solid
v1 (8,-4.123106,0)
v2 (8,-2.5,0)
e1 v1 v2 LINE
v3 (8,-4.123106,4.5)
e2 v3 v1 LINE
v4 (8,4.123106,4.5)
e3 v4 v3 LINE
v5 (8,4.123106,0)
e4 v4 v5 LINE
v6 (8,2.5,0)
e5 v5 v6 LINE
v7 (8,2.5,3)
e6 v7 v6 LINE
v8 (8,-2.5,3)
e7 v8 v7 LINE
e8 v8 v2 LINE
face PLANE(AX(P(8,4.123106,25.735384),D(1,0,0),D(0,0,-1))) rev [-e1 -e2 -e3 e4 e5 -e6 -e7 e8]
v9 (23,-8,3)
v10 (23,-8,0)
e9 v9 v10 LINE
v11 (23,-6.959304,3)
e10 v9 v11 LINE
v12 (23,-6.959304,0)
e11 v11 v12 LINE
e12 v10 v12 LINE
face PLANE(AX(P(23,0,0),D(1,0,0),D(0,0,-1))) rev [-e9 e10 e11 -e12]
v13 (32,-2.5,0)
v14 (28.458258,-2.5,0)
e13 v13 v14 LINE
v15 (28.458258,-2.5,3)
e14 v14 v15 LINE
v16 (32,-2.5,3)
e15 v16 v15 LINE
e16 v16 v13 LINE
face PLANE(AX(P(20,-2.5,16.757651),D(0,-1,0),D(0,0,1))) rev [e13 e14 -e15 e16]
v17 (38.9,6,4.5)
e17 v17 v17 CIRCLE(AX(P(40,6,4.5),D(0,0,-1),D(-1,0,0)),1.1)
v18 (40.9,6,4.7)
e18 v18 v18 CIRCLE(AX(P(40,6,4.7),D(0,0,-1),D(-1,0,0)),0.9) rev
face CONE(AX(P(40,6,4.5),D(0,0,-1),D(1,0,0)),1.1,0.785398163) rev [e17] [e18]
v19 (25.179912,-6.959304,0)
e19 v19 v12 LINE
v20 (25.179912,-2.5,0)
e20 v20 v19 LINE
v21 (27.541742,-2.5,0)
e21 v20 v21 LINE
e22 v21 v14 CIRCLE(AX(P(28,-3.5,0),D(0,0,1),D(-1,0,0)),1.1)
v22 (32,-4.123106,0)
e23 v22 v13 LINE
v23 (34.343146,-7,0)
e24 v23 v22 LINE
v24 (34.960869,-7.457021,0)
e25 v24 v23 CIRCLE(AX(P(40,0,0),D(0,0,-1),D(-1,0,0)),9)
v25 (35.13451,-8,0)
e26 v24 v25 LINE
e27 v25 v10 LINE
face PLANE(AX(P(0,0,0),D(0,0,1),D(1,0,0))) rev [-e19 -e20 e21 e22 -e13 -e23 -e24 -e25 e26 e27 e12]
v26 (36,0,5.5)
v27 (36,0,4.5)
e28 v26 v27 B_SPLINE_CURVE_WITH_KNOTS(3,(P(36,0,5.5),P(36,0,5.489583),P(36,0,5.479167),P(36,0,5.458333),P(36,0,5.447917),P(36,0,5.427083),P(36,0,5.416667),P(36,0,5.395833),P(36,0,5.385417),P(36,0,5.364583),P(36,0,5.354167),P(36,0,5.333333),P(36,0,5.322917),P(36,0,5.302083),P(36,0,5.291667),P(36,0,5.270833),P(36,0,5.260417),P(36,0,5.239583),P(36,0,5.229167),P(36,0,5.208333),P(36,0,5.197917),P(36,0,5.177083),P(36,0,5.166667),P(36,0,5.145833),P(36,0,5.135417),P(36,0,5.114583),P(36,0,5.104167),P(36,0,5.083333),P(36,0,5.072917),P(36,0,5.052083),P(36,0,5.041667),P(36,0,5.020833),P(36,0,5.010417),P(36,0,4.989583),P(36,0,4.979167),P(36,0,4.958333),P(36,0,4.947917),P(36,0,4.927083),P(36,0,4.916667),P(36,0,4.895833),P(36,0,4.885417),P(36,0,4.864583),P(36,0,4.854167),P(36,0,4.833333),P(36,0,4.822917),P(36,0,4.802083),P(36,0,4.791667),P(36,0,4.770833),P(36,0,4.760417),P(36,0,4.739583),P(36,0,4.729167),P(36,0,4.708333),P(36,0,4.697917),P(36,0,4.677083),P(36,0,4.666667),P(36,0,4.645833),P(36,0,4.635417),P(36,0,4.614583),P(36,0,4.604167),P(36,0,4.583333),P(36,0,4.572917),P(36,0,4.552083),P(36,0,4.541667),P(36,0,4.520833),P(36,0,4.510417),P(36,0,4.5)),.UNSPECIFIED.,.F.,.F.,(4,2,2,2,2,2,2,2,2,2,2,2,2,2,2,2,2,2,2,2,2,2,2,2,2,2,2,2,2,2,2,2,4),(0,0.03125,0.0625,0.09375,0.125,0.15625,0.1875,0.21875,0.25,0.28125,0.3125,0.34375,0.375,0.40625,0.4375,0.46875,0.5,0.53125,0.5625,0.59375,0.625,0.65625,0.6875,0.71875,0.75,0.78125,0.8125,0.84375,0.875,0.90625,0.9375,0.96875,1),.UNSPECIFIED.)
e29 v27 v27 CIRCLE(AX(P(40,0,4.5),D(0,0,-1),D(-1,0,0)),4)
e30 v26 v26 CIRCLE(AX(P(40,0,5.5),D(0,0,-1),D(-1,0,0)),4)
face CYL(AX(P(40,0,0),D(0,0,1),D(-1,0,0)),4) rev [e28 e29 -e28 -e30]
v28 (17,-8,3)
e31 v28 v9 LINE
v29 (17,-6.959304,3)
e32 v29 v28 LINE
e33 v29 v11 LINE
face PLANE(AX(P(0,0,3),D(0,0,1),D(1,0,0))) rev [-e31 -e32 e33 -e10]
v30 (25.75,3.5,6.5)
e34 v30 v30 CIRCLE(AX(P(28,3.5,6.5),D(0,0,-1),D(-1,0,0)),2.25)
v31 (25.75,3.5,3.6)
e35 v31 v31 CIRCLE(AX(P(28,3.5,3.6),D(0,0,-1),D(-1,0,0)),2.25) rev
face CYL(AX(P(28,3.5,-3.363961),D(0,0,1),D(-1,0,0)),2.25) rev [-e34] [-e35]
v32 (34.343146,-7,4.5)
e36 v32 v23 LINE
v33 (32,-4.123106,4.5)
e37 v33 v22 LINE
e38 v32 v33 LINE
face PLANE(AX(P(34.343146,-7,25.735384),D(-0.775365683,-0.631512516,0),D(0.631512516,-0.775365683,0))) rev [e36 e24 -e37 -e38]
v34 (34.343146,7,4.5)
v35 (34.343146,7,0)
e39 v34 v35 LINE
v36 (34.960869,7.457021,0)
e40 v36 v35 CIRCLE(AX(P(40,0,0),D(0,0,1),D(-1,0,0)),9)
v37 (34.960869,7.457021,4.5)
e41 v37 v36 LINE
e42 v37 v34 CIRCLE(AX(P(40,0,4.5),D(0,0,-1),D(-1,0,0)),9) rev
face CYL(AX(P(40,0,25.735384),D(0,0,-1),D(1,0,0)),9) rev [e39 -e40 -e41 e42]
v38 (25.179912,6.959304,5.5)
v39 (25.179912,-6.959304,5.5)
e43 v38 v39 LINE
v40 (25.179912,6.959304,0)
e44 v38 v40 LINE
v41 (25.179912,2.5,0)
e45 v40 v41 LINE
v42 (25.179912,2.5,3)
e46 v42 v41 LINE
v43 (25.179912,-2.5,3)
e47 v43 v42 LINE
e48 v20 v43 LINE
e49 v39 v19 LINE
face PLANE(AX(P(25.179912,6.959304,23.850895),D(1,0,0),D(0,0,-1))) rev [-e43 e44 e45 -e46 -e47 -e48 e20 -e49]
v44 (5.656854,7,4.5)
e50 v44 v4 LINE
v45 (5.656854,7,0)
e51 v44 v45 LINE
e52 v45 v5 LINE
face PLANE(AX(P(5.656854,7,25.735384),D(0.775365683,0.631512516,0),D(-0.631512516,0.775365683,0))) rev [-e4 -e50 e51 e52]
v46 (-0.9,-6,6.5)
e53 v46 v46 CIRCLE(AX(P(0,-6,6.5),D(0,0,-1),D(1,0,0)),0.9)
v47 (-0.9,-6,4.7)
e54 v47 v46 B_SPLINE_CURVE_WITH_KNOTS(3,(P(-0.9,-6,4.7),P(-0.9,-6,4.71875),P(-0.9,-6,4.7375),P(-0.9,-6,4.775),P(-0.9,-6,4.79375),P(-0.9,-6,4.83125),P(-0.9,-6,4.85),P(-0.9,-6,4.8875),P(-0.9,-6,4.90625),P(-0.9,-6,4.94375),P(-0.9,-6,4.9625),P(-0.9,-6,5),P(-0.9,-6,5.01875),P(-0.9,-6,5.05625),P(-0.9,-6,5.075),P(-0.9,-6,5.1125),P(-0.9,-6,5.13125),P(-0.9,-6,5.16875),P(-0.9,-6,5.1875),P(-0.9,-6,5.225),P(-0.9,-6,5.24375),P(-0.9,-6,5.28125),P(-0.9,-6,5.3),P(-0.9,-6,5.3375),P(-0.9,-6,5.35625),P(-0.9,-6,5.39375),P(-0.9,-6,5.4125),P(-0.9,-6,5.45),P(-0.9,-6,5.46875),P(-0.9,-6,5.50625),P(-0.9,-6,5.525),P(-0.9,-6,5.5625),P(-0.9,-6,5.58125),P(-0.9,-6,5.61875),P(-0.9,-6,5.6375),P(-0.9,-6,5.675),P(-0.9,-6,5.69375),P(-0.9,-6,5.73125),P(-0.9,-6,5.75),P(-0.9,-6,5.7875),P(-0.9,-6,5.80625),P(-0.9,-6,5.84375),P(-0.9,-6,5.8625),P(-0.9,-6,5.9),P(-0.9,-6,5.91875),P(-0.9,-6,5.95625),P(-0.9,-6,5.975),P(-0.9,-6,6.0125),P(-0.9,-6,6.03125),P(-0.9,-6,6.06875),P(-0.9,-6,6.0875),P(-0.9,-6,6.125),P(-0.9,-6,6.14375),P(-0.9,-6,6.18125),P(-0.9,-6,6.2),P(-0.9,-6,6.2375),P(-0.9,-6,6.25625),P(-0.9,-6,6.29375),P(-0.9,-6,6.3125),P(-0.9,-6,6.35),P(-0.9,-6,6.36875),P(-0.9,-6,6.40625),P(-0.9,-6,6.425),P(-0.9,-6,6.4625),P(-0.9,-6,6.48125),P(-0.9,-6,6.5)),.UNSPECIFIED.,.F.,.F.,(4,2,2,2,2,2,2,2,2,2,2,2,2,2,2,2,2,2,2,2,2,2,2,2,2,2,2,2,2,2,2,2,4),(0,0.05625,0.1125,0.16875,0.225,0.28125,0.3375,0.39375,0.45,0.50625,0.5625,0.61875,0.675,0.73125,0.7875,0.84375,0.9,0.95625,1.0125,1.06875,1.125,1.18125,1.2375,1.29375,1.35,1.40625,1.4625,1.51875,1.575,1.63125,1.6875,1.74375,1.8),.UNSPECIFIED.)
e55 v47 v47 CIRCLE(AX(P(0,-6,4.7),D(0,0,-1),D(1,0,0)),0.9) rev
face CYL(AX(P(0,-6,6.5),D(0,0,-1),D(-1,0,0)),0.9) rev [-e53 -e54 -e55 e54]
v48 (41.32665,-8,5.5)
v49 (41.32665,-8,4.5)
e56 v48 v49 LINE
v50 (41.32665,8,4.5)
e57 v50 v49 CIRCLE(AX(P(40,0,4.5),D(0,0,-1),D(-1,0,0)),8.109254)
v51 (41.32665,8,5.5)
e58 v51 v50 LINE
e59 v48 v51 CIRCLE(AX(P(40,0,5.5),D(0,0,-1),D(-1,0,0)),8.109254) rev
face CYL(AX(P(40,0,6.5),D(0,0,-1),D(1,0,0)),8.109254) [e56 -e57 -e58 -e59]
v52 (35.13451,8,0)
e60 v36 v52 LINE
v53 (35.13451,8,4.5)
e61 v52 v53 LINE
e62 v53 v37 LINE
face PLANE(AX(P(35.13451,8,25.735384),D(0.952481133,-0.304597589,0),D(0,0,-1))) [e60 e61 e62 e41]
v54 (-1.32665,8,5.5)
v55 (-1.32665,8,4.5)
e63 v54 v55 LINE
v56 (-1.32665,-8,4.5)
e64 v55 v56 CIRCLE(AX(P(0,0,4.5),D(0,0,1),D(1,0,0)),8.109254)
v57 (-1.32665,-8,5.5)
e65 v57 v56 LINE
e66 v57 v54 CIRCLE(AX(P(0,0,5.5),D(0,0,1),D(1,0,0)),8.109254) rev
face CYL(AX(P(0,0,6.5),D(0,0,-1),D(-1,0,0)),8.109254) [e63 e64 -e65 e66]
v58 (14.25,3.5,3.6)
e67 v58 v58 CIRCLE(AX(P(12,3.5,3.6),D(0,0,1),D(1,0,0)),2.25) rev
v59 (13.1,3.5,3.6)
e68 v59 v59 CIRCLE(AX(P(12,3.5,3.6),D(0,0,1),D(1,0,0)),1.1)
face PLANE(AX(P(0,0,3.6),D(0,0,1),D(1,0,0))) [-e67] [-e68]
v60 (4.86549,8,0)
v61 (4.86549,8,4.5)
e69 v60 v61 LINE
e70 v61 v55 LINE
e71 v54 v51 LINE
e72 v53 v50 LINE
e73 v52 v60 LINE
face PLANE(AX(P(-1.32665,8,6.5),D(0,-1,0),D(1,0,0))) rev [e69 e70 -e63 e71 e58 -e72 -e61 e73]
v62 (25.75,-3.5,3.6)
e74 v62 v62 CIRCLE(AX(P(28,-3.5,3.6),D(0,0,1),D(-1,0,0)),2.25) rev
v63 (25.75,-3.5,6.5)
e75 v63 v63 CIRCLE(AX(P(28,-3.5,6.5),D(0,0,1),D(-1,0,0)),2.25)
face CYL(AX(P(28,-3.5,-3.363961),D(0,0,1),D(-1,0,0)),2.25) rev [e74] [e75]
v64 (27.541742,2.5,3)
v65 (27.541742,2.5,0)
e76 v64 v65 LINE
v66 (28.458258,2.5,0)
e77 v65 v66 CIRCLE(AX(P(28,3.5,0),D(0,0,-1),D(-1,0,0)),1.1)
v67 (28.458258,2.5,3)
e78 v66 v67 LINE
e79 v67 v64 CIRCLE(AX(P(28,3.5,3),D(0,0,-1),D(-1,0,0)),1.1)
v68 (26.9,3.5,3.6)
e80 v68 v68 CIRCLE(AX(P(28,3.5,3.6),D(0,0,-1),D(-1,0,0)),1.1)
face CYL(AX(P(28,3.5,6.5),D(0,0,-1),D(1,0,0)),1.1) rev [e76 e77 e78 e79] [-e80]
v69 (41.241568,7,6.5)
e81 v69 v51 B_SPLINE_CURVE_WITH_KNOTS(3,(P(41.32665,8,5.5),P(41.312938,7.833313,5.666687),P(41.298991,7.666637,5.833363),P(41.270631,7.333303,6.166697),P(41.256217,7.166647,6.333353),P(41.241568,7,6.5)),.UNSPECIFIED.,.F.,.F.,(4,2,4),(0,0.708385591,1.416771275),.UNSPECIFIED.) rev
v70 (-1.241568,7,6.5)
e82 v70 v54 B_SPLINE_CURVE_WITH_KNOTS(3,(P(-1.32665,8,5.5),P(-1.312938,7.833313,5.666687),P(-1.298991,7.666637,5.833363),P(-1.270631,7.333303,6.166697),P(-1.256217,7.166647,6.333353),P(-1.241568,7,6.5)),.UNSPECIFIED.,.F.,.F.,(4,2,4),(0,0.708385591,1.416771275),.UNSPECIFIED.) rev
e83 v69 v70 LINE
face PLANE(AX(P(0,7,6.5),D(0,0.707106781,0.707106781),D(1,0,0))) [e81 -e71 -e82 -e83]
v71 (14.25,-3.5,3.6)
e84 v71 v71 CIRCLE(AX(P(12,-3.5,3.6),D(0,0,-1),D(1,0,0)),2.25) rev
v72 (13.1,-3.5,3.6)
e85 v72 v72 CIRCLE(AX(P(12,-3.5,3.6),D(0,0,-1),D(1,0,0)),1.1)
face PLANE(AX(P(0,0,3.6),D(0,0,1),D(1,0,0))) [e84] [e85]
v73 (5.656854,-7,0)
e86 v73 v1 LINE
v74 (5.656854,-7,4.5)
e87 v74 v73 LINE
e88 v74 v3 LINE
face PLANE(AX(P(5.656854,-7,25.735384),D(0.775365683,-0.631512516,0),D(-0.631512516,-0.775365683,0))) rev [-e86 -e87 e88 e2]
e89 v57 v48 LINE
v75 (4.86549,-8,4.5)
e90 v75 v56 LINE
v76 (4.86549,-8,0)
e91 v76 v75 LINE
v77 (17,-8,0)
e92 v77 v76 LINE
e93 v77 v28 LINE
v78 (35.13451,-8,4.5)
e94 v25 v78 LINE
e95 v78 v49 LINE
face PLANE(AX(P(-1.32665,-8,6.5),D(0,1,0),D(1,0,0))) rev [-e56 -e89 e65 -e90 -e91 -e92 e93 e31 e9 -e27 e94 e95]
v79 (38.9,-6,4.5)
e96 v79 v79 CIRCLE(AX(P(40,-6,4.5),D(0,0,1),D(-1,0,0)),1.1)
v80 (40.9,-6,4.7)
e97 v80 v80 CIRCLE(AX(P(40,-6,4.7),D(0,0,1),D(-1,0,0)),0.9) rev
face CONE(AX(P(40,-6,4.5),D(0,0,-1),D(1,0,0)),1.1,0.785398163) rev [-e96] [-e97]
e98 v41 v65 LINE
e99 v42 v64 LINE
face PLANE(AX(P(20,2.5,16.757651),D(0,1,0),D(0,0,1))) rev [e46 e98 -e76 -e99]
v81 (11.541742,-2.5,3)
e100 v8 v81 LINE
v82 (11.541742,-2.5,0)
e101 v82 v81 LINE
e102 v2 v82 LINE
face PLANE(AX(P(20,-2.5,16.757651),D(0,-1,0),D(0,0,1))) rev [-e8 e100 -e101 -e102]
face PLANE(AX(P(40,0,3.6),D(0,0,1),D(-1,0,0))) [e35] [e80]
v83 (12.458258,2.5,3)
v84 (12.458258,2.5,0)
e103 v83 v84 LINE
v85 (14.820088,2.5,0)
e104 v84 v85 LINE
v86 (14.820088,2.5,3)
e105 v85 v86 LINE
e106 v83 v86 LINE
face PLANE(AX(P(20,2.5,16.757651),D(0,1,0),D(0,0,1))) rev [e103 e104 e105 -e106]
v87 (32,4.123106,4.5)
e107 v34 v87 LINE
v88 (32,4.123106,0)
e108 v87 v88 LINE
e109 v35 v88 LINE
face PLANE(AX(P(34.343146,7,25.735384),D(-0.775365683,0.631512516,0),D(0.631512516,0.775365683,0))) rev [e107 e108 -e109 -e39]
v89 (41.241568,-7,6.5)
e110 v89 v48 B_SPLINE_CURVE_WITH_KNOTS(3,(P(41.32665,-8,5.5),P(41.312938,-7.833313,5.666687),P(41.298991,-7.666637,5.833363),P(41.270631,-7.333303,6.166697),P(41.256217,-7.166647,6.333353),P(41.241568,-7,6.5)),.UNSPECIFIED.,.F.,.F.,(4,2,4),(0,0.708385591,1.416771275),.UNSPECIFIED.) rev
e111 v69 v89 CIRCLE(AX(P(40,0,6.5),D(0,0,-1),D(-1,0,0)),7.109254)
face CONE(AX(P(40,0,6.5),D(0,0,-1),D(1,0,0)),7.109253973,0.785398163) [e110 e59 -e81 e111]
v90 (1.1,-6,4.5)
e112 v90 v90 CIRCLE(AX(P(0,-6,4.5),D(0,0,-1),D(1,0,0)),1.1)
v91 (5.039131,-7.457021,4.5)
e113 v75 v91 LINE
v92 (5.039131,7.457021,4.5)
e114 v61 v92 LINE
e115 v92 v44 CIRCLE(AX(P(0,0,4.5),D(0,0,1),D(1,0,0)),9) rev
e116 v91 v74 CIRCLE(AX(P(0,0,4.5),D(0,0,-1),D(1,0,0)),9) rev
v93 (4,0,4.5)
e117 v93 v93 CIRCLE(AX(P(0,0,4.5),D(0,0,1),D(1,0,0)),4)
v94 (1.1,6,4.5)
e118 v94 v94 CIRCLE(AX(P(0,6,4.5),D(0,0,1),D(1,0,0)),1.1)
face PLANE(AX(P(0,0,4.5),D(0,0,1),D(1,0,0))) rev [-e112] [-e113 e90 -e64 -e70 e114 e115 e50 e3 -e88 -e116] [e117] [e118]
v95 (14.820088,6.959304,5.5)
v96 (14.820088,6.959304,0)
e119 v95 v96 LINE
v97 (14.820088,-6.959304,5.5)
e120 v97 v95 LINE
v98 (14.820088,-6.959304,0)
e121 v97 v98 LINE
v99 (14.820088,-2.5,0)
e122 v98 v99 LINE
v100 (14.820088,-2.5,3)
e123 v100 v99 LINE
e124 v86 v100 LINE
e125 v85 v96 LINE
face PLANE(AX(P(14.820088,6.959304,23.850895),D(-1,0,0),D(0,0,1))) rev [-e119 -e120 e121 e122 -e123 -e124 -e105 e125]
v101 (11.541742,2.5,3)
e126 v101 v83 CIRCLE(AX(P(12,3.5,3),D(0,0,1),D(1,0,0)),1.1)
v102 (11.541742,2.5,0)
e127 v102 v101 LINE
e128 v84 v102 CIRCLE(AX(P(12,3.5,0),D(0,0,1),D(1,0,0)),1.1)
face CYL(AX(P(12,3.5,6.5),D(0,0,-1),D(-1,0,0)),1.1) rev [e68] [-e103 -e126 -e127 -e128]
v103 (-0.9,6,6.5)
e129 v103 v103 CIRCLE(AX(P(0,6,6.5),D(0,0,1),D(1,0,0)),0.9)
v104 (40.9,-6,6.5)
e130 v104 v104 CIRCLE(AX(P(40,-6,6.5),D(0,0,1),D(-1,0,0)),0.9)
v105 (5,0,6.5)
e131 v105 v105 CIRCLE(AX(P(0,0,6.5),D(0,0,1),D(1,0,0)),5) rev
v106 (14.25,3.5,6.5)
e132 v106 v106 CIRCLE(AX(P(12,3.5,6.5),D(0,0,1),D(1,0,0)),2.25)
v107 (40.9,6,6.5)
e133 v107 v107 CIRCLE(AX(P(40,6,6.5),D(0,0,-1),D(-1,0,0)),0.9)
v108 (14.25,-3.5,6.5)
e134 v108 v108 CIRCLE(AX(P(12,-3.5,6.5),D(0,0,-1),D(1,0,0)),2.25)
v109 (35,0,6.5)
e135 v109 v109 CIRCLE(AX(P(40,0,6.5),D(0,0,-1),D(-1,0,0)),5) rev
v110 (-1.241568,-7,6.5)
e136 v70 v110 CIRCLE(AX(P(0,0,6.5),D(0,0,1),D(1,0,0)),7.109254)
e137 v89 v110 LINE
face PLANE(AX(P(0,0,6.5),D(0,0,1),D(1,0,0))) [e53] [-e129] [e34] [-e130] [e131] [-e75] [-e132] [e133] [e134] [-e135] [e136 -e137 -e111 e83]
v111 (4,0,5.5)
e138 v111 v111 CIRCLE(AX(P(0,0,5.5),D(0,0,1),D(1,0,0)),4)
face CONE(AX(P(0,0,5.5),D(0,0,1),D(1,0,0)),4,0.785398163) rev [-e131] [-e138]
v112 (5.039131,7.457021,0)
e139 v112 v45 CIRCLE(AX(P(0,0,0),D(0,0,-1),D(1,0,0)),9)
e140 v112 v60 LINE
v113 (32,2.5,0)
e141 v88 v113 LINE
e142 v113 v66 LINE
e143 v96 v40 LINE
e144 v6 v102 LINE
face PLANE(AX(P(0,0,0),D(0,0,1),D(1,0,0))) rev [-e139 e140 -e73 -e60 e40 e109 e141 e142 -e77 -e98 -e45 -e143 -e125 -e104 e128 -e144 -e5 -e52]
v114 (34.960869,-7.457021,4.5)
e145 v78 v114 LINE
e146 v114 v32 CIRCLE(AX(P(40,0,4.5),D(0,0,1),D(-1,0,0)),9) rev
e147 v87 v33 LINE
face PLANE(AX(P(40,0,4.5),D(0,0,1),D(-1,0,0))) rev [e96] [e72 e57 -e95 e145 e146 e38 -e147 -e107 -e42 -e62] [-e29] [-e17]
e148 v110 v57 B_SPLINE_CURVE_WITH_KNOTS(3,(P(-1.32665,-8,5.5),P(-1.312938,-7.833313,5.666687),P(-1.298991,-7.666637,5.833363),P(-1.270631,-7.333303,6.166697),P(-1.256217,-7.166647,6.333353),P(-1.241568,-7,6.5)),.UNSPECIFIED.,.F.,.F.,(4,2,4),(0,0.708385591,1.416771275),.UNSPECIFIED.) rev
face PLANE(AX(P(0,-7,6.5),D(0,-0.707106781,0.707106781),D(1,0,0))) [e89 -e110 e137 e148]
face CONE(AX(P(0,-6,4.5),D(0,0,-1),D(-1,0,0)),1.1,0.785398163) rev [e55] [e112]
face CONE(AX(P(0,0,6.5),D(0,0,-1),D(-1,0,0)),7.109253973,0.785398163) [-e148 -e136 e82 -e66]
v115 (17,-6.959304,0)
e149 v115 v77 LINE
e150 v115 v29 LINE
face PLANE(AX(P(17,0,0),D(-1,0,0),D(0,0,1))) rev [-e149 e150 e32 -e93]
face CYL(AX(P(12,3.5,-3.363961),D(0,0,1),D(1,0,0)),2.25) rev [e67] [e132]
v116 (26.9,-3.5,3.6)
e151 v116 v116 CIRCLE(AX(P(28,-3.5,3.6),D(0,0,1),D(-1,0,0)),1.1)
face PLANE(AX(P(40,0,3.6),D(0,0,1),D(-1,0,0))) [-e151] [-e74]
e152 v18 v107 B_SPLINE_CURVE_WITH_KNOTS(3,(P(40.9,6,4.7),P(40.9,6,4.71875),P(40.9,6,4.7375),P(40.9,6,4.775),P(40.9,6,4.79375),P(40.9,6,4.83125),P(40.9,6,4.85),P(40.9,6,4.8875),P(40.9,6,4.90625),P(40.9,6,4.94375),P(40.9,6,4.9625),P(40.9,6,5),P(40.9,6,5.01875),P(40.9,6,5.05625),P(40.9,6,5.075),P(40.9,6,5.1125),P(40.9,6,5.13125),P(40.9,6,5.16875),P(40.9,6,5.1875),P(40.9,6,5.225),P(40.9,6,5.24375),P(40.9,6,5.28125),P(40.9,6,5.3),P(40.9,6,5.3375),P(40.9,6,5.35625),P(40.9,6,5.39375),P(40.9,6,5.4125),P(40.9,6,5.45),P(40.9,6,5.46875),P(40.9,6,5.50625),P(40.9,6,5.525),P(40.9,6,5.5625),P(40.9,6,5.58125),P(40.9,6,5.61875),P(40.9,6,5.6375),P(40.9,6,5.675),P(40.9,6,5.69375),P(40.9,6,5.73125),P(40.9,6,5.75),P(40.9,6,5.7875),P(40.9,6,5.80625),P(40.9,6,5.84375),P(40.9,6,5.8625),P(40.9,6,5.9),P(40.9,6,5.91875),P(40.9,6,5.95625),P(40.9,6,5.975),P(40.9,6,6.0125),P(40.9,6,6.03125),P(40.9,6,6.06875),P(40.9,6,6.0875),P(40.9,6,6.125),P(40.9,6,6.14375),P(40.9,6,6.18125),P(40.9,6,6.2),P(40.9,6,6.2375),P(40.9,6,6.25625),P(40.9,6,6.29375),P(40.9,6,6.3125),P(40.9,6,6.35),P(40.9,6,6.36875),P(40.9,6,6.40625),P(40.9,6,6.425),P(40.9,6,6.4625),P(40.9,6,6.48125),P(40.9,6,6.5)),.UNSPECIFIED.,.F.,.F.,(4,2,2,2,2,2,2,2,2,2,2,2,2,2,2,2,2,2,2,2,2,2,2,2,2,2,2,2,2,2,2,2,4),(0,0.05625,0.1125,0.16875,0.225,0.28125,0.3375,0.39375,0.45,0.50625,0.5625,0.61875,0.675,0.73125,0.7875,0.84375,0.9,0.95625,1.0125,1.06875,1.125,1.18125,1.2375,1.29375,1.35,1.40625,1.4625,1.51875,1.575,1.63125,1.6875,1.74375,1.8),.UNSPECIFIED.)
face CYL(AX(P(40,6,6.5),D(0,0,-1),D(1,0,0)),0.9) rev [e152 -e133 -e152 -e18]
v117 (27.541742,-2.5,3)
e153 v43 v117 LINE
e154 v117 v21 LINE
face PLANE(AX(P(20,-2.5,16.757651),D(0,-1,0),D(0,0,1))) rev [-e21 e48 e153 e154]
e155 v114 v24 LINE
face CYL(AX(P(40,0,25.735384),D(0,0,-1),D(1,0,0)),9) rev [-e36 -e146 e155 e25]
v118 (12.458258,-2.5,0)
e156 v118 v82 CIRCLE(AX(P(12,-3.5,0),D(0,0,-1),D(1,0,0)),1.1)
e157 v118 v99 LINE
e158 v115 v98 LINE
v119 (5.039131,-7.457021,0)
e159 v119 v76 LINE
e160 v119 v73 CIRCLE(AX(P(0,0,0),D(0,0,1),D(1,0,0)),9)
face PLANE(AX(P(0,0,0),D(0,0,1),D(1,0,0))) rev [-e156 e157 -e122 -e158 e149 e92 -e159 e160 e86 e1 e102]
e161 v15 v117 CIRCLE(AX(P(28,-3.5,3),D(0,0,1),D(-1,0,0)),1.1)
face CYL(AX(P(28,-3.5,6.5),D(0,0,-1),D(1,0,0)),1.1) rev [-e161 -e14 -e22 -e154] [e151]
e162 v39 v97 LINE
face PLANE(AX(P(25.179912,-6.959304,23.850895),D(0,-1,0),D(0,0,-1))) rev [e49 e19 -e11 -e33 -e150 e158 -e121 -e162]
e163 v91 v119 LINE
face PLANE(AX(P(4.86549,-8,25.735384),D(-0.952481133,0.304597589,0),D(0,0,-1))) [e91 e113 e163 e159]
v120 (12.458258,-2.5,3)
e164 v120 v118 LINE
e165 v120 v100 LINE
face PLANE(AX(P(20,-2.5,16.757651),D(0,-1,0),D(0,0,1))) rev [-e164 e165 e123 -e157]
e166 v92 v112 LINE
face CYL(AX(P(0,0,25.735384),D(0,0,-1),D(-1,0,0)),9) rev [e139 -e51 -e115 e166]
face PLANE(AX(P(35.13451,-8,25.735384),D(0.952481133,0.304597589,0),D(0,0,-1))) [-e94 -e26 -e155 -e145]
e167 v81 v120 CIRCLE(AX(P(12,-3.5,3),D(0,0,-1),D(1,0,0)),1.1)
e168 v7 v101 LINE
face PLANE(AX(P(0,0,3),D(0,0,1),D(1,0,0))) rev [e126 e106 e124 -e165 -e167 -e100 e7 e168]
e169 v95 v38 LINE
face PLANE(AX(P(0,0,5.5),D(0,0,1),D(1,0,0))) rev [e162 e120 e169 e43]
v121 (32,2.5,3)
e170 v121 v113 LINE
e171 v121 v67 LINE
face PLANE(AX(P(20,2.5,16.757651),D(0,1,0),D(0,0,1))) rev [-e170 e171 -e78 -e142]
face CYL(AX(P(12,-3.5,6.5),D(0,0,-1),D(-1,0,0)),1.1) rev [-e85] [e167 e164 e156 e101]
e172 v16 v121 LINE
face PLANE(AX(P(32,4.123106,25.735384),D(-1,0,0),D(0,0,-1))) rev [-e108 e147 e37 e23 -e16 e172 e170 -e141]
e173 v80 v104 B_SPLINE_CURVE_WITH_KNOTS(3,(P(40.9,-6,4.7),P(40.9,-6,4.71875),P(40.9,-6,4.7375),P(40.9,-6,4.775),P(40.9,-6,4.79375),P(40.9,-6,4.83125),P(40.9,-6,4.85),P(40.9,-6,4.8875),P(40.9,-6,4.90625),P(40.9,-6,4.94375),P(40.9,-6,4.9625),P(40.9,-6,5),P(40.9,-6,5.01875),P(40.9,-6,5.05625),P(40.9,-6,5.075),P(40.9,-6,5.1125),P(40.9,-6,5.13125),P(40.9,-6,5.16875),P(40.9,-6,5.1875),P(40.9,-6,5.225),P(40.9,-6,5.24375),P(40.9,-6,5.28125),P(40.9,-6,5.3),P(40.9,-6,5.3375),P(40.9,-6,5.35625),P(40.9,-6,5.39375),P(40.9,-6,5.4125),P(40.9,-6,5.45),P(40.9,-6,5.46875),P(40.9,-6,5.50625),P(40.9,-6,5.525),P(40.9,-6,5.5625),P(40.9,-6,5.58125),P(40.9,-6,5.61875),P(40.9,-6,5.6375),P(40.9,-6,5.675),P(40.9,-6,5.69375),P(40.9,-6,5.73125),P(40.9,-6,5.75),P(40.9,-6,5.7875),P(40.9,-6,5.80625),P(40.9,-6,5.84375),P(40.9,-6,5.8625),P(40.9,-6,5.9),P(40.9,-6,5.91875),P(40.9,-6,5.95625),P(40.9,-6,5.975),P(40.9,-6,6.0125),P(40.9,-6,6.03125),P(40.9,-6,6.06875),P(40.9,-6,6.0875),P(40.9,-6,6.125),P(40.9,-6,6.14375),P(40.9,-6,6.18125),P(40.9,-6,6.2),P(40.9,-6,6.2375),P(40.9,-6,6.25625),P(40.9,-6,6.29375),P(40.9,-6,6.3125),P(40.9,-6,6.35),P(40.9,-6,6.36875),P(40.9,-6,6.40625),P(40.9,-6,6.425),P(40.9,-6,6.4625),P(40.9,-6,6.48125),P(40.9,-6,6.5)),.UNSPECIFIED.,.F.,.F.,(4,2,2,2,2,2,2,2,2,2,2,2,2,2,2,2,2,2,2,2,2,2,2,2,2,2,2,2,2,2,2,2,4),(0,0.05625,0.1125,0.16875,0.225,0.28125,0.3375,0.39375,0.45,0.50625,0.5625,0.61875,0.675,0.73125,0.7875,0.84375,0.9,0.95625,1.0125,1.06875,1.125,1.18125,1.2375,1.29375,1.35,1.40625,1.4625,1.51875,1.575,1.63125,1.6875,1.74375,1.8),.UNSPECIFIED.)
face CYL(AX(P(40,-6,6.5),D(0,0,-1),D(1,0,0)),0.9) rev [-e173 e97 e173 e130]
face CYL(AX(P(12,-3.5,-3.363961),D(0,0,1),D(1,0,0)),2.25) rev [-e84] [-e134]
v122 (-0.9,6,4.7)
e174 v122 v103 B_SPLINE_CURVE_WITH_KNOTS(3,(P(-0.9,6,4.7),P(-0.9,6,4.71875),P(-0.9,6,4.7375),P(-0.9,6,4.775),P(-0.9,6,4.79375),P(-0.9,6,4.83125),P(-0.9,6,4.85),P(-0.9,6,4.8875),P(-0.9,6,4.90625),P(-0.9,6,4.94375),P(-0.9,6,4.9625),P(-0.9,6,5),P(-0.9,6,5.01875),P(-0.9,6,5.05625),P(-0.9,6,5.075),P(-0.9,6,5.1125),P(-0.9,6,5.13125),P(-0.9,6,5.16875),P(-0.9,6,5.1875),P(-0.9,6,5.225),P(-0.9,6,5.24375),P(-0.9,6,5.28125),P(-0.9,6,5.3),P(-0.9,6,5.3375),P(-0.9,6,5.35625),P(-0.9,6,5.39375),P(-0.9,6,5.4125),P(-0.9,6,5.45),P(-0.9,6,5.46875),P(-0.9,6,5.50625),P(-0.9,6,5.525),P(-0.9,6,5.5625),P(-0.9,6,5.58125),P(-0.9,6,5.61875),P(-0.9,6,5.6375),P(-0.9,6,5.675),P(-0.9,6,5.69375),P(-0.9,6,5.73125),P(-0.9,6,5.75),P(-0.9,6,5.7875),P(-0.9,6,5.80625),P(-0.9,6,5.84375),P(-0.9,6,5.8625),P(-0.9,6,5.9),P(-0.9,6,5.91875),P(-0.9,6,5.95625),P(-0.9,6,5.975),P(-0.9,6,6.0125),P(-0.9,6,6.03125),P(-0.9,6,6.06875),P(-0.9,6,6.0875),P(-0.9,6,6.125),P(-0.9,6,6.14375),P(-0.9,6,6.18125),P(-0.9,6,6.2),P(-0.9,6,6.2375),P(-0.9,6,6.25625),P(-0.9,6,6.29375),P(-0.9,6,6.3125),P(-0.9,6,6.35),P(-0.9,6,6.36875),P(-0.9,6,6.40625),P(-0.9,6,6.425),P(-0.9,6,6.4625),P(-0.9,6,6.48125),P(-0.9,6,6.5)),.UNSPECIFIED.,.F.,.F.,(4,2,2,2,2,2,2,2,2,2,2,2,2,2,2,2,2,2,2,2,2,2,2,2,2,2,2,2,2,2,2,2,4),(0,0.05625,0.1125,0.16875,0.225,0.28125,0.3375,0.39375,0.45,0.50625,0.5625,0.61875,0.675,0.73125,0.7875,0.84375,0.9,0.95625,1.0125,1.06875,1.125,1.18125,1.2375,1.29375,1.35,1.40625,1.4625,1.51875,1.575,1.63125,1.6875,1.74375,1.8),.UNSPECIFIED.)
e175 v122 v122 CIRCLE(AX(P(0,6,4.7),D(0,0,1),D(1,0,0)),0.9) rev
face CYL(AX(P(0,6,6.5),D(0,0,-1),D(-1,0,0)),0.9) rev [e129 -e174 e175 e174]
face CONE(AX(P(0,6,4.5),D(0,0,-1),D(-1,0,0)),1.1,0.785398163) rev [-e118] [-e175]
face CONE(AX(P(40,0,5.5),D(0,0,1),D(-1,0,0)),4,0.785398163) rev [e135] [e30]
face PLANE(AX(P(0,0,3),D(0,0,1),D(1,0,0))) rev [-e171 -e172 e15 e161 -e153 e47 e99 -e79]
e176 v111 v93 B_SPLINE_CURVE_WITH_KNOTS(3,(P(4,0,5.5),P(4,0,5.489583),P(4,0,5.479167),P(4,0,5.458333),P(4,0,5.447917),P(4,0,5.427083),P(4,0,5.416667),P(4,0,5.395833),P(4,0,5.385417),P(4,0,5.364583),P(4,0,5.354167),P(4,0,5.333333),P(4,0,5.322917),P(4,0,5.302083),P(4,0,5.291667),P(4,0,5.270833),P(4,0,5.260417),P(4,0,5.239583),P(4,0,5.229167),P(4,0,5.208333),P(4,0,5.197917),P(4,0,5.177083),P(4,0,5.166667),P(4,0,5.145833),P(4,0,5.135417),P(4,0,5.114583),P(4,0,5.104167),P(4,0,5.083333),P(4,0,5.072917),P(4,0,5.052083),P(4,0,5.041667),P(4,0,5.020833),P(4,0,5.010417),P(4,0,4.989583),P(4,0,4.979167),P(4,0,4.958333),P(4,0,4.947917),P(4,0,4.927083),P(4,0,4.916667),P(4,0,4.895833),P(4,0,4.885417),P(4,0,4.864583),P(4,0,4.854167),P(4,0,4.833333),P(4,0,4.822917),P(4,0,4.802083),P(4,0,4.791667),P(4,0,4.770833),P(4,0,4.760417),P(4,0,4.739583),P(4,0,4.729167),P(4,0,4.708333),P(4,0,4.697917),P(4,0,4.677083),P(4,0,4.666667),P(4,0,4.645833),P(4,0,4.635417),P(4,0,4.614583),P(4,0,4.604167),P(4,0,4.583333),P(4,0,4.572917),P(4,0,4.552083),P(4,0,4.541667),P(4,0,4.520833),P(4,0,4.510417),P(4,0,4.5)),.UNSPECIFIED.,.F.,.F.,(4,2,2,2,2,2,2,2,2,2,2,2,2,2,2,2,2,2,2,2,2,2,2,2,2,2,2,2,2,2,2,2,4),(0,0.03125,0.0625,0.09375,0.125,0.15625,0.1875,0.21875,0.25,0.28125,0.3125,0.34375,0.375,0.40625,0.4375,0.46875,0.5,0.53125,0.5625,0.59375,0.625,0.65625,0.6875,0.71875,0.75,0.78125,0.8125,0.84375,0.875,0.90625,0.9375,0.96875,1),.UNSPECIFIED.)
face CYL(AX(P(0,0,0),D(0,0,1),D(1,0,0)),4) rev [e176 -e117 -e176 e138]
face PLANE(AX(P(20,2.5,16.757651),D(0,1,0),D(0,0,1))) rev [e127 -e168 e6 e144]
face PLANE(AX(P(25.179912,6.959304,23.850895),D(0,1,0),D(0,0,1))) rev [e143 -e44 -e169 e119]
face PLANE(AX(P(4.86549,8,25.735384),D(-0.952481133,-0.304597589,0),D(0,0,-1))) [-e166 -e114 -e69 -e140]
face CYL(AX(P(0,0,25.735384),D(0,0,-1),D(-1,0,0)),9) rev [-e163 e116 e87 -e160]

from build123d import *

# Parameters (mm, degrees)
CROQUIS1_R              = 0.9
CROQUIS1_R_2            = 1.1
SALIENTE_EXTRUIR1_DEPTH = 6.5
CORTAR_EXTRUIR6_DEPTH   = 4.5
CHAFL_N1_SIZE           = 1
CHAFL_N1_SIZE_2         = 0.742384029
CROQUIS5_W              = 12
CROQUIS5_H              = 2.5
CORTAR_EXTRUIR7_DEPTH   = 3
CROQUIS6_R              = 2.25
CORTAR_EXTRUIR8_DEPTH   = 2.9
CHAFL_N3_SIZE           = 0.2
CROQUIS7_R              = 4
CORTAR_EXTRUIR9_DEPTH   = 23.5
CHAFL_N2_SIZE           = 1
CORTAR_EXTRUIR2_START   = -6.5
CROQUIS3_W              = 6
CROQUIS3_H              = 17.049295702
CORTAR_EXTRUIR2_DEPTH   = 3
CROQUIS8_W              = 10.359823846
CROQUIS8_H              = 13.918607014
CORTAR_EXTRUIR10_DEPTH  = 5.5


with BuildPart() as part:
    # Croquis1 → Saliente-Extruir1 (new body)
    with BuildSketch(Plane.XY):
        with BuildLine():
            Line((-1.326649916, 8), (20, 8))
            Line((20, 8), (20, 0))
            Line((20, 0), (8, 0))
            Line((8, 0), (-8.109253973, 0))
            ThreePointArc((-8.109253973, 0), (-6.185391706, 5.24413286), (-1.326649916, 8))
        make_face()
        with Locations(Location((0, 6, 0), (0, 0, 180))):
            Circle(CROQUIS1_R, mode=Mode.SUBTRACT)
        with Locations(Location((12, 3.5, 0), (0, 0, 180))):
            Circle(CROQUIS1_R_2, mode=Mode.SUBTRACT)
    extrude(amount=SALIENTE_EXTRUIR1_DEPTH)

    # Croquis4 → Cortar-Extruir6 (cut)
    with BuildSketch(Plane(origin=(0, 0, 0), x_dir=(-1, 0, 0), z_dir=(0, 0, -1))):
        with BuildLine():
            Line((-5.656854249, 7), (-8, 4.123105626))
            Line((-8, 4.123105626), (-8, 0))
            Line((-8, 0), (8.109253973, 0))
            Line((8.109253973, 0), (9, 0))
            ThreePointArc((9, 0), (3.878679656, 8.121320344), (-5.656854249, 7))
        make_face()
    extrude(amount=-CORTAR_EXTRUIR6_DEPTH, mode=Mode.SUBTRACT)

    # Chaflán1
    # the kernel refuses this chamfer: 1, 0.742384029 mm, written as the material it takes off along each edge
    with BuildSketch(Plane(origin=(-5.698510996, 8, 6.5), x_dir=(0, 0, -1), z_dir=(1, 0, 0))) as chafl_n1_piece_1:
        Polygon((CHAFL_N1_SIZE, 0), (0, -CHAFL_N1_SIZE), (0, 0), align=None)
    extrude(amount=28.270193984, mode=Mode.SUBTRACT)
    with BuildSketch(Plane(origin=(4.123105626, 8, 4.5), x_dir=(1, 0, 0), z_dir=(0, 0, -1))) as chafl_n1_piece_2:
        with BuildLine():
            Line((CHAFL_N1_SIZE_2, 0), (0.916025454, 0.542979283))
            ThreePointArc((0.916025454, 0.542979283), (0.478949419, 0.265590562), (0, 0))
            Line((0, 0), (CHAFL_N1_SIZE_2, 0))
        make_face()
    extrude(amount=7.23772815, mode=Mode.SUBTRACT)
    with BuildSketch(Plane(origin=(0, 0, 6.5), x_dir=(-0.9501026430594787, -0.31193744188762096, 0), z_dir=(0.31193744188762096, -0.9501026430594787, 0))) as chafl_n1_piece_3:
        Polygon((8.109253973 - CHAFL_N1_SIZE, 0), (8.109253973, CHAFL_N1_SIZE), (8.109253973, 0), align=None)
    revolve(axis=Axis((0, 0, 6.5), (0, 0, -1)), revolution_arc=116.936314038, mode=Mode.SUBTRACT)

    # Croquis5 → Cortar-Extruir7 (cut)
    with BuildSketch(Plane(origin=(0, 0, 0), x_dir=(-1, 0, 0), z_dir=(0, 0, -1))):
        with Locations((-14, 1.25)):
            Rectangle(CROQUIS5_W, CROQUIS5_H)
    extrude(amount=-CORTAR_EXTRUIR7_DEPTH, mode=Mode.SUBTRACT)

    # Croquis6 → Cortar-Extruir8 (cut)
    with BuildSketch(Plane.XY.offset(6.5)):
        with Locations((12, 3.5)):
            Circle(CROQUIS6_R)
    extrude(amount=-CORTAR_EXTRUIR8_DEPTH, mode=Mode.SUBTRACT)

    # Chaflán3
    chafl_n3_edges = [part.edges().sort_by_distance(p)[0] for p in [
        (0.9, 6, 4.5),
    ]]
    chamfer(chafl_n3_edges, length=CHAFL_N3_SIZE)

    # Simetría1: part across plane


with BuildPart() as part_1:
    add(part.part)
    add(part.part.mirror(Plane(origin=(20, 0, 6.5), x_dir=(0, 0, 1), z_dir=(0, 1, 0))))

    # Croquis7 → Cortar-Extruir9 (cut, through all)
    with BuildSketch(Plane.XY.offset(6.5)):
        Circle(CROQUIS7_R)
    extrude(amount=-CORTAR_EXTRUIR9_DEPTH, mode=Mode.SUBTRACT)

    # Chaflán2
    chafl_n2_edges = [part_1.edges().sort_by_distance(p)[0] for p in [
        (-4, 0, 6.5),
    ]]
    chamfer(chafl_n2_edges, length=CHAFL_N2_SIZE)

    # Simetría2: part across plane


with BuildPart() as part_2:
    add(part_1.part)
    add(part_1.part.mirror(Plane(origin=(20, 8, 6.5), x_dir=(0, 0, 1), z_dir=(-1, 0, 0))))

    # Croquis3 → Cortar-Extruir2 (cut)
    with BuildSketch(Plane.XY.offset(6.5).offset(CORTAR_EXTRUIR2_START)):
        with Locations((20, -8)):
            Rectangle(CROQUIS3_W, CROQUIS3_H)
    extrude(amount=CORTAR_EXTRUIR2_DEPTH, mode=Mode.SUBTRACT)

    # Croquis8 → Cortar-Extruir10 (cut)
    with BuildSketch(Plane(origin=(0, 0, 0), x_dir=(-1, 0, 0), z_dir=(0, 0, -1))):
        with Locations((-20, 0)):
            Rectangle(CROQUIS8_W, CROQUIS8_H)
    extrude(amount=-CORTAR_EXTRUIR10_DEPTH, mode=Mode.SUBTRACT)


solid = part_2.part
